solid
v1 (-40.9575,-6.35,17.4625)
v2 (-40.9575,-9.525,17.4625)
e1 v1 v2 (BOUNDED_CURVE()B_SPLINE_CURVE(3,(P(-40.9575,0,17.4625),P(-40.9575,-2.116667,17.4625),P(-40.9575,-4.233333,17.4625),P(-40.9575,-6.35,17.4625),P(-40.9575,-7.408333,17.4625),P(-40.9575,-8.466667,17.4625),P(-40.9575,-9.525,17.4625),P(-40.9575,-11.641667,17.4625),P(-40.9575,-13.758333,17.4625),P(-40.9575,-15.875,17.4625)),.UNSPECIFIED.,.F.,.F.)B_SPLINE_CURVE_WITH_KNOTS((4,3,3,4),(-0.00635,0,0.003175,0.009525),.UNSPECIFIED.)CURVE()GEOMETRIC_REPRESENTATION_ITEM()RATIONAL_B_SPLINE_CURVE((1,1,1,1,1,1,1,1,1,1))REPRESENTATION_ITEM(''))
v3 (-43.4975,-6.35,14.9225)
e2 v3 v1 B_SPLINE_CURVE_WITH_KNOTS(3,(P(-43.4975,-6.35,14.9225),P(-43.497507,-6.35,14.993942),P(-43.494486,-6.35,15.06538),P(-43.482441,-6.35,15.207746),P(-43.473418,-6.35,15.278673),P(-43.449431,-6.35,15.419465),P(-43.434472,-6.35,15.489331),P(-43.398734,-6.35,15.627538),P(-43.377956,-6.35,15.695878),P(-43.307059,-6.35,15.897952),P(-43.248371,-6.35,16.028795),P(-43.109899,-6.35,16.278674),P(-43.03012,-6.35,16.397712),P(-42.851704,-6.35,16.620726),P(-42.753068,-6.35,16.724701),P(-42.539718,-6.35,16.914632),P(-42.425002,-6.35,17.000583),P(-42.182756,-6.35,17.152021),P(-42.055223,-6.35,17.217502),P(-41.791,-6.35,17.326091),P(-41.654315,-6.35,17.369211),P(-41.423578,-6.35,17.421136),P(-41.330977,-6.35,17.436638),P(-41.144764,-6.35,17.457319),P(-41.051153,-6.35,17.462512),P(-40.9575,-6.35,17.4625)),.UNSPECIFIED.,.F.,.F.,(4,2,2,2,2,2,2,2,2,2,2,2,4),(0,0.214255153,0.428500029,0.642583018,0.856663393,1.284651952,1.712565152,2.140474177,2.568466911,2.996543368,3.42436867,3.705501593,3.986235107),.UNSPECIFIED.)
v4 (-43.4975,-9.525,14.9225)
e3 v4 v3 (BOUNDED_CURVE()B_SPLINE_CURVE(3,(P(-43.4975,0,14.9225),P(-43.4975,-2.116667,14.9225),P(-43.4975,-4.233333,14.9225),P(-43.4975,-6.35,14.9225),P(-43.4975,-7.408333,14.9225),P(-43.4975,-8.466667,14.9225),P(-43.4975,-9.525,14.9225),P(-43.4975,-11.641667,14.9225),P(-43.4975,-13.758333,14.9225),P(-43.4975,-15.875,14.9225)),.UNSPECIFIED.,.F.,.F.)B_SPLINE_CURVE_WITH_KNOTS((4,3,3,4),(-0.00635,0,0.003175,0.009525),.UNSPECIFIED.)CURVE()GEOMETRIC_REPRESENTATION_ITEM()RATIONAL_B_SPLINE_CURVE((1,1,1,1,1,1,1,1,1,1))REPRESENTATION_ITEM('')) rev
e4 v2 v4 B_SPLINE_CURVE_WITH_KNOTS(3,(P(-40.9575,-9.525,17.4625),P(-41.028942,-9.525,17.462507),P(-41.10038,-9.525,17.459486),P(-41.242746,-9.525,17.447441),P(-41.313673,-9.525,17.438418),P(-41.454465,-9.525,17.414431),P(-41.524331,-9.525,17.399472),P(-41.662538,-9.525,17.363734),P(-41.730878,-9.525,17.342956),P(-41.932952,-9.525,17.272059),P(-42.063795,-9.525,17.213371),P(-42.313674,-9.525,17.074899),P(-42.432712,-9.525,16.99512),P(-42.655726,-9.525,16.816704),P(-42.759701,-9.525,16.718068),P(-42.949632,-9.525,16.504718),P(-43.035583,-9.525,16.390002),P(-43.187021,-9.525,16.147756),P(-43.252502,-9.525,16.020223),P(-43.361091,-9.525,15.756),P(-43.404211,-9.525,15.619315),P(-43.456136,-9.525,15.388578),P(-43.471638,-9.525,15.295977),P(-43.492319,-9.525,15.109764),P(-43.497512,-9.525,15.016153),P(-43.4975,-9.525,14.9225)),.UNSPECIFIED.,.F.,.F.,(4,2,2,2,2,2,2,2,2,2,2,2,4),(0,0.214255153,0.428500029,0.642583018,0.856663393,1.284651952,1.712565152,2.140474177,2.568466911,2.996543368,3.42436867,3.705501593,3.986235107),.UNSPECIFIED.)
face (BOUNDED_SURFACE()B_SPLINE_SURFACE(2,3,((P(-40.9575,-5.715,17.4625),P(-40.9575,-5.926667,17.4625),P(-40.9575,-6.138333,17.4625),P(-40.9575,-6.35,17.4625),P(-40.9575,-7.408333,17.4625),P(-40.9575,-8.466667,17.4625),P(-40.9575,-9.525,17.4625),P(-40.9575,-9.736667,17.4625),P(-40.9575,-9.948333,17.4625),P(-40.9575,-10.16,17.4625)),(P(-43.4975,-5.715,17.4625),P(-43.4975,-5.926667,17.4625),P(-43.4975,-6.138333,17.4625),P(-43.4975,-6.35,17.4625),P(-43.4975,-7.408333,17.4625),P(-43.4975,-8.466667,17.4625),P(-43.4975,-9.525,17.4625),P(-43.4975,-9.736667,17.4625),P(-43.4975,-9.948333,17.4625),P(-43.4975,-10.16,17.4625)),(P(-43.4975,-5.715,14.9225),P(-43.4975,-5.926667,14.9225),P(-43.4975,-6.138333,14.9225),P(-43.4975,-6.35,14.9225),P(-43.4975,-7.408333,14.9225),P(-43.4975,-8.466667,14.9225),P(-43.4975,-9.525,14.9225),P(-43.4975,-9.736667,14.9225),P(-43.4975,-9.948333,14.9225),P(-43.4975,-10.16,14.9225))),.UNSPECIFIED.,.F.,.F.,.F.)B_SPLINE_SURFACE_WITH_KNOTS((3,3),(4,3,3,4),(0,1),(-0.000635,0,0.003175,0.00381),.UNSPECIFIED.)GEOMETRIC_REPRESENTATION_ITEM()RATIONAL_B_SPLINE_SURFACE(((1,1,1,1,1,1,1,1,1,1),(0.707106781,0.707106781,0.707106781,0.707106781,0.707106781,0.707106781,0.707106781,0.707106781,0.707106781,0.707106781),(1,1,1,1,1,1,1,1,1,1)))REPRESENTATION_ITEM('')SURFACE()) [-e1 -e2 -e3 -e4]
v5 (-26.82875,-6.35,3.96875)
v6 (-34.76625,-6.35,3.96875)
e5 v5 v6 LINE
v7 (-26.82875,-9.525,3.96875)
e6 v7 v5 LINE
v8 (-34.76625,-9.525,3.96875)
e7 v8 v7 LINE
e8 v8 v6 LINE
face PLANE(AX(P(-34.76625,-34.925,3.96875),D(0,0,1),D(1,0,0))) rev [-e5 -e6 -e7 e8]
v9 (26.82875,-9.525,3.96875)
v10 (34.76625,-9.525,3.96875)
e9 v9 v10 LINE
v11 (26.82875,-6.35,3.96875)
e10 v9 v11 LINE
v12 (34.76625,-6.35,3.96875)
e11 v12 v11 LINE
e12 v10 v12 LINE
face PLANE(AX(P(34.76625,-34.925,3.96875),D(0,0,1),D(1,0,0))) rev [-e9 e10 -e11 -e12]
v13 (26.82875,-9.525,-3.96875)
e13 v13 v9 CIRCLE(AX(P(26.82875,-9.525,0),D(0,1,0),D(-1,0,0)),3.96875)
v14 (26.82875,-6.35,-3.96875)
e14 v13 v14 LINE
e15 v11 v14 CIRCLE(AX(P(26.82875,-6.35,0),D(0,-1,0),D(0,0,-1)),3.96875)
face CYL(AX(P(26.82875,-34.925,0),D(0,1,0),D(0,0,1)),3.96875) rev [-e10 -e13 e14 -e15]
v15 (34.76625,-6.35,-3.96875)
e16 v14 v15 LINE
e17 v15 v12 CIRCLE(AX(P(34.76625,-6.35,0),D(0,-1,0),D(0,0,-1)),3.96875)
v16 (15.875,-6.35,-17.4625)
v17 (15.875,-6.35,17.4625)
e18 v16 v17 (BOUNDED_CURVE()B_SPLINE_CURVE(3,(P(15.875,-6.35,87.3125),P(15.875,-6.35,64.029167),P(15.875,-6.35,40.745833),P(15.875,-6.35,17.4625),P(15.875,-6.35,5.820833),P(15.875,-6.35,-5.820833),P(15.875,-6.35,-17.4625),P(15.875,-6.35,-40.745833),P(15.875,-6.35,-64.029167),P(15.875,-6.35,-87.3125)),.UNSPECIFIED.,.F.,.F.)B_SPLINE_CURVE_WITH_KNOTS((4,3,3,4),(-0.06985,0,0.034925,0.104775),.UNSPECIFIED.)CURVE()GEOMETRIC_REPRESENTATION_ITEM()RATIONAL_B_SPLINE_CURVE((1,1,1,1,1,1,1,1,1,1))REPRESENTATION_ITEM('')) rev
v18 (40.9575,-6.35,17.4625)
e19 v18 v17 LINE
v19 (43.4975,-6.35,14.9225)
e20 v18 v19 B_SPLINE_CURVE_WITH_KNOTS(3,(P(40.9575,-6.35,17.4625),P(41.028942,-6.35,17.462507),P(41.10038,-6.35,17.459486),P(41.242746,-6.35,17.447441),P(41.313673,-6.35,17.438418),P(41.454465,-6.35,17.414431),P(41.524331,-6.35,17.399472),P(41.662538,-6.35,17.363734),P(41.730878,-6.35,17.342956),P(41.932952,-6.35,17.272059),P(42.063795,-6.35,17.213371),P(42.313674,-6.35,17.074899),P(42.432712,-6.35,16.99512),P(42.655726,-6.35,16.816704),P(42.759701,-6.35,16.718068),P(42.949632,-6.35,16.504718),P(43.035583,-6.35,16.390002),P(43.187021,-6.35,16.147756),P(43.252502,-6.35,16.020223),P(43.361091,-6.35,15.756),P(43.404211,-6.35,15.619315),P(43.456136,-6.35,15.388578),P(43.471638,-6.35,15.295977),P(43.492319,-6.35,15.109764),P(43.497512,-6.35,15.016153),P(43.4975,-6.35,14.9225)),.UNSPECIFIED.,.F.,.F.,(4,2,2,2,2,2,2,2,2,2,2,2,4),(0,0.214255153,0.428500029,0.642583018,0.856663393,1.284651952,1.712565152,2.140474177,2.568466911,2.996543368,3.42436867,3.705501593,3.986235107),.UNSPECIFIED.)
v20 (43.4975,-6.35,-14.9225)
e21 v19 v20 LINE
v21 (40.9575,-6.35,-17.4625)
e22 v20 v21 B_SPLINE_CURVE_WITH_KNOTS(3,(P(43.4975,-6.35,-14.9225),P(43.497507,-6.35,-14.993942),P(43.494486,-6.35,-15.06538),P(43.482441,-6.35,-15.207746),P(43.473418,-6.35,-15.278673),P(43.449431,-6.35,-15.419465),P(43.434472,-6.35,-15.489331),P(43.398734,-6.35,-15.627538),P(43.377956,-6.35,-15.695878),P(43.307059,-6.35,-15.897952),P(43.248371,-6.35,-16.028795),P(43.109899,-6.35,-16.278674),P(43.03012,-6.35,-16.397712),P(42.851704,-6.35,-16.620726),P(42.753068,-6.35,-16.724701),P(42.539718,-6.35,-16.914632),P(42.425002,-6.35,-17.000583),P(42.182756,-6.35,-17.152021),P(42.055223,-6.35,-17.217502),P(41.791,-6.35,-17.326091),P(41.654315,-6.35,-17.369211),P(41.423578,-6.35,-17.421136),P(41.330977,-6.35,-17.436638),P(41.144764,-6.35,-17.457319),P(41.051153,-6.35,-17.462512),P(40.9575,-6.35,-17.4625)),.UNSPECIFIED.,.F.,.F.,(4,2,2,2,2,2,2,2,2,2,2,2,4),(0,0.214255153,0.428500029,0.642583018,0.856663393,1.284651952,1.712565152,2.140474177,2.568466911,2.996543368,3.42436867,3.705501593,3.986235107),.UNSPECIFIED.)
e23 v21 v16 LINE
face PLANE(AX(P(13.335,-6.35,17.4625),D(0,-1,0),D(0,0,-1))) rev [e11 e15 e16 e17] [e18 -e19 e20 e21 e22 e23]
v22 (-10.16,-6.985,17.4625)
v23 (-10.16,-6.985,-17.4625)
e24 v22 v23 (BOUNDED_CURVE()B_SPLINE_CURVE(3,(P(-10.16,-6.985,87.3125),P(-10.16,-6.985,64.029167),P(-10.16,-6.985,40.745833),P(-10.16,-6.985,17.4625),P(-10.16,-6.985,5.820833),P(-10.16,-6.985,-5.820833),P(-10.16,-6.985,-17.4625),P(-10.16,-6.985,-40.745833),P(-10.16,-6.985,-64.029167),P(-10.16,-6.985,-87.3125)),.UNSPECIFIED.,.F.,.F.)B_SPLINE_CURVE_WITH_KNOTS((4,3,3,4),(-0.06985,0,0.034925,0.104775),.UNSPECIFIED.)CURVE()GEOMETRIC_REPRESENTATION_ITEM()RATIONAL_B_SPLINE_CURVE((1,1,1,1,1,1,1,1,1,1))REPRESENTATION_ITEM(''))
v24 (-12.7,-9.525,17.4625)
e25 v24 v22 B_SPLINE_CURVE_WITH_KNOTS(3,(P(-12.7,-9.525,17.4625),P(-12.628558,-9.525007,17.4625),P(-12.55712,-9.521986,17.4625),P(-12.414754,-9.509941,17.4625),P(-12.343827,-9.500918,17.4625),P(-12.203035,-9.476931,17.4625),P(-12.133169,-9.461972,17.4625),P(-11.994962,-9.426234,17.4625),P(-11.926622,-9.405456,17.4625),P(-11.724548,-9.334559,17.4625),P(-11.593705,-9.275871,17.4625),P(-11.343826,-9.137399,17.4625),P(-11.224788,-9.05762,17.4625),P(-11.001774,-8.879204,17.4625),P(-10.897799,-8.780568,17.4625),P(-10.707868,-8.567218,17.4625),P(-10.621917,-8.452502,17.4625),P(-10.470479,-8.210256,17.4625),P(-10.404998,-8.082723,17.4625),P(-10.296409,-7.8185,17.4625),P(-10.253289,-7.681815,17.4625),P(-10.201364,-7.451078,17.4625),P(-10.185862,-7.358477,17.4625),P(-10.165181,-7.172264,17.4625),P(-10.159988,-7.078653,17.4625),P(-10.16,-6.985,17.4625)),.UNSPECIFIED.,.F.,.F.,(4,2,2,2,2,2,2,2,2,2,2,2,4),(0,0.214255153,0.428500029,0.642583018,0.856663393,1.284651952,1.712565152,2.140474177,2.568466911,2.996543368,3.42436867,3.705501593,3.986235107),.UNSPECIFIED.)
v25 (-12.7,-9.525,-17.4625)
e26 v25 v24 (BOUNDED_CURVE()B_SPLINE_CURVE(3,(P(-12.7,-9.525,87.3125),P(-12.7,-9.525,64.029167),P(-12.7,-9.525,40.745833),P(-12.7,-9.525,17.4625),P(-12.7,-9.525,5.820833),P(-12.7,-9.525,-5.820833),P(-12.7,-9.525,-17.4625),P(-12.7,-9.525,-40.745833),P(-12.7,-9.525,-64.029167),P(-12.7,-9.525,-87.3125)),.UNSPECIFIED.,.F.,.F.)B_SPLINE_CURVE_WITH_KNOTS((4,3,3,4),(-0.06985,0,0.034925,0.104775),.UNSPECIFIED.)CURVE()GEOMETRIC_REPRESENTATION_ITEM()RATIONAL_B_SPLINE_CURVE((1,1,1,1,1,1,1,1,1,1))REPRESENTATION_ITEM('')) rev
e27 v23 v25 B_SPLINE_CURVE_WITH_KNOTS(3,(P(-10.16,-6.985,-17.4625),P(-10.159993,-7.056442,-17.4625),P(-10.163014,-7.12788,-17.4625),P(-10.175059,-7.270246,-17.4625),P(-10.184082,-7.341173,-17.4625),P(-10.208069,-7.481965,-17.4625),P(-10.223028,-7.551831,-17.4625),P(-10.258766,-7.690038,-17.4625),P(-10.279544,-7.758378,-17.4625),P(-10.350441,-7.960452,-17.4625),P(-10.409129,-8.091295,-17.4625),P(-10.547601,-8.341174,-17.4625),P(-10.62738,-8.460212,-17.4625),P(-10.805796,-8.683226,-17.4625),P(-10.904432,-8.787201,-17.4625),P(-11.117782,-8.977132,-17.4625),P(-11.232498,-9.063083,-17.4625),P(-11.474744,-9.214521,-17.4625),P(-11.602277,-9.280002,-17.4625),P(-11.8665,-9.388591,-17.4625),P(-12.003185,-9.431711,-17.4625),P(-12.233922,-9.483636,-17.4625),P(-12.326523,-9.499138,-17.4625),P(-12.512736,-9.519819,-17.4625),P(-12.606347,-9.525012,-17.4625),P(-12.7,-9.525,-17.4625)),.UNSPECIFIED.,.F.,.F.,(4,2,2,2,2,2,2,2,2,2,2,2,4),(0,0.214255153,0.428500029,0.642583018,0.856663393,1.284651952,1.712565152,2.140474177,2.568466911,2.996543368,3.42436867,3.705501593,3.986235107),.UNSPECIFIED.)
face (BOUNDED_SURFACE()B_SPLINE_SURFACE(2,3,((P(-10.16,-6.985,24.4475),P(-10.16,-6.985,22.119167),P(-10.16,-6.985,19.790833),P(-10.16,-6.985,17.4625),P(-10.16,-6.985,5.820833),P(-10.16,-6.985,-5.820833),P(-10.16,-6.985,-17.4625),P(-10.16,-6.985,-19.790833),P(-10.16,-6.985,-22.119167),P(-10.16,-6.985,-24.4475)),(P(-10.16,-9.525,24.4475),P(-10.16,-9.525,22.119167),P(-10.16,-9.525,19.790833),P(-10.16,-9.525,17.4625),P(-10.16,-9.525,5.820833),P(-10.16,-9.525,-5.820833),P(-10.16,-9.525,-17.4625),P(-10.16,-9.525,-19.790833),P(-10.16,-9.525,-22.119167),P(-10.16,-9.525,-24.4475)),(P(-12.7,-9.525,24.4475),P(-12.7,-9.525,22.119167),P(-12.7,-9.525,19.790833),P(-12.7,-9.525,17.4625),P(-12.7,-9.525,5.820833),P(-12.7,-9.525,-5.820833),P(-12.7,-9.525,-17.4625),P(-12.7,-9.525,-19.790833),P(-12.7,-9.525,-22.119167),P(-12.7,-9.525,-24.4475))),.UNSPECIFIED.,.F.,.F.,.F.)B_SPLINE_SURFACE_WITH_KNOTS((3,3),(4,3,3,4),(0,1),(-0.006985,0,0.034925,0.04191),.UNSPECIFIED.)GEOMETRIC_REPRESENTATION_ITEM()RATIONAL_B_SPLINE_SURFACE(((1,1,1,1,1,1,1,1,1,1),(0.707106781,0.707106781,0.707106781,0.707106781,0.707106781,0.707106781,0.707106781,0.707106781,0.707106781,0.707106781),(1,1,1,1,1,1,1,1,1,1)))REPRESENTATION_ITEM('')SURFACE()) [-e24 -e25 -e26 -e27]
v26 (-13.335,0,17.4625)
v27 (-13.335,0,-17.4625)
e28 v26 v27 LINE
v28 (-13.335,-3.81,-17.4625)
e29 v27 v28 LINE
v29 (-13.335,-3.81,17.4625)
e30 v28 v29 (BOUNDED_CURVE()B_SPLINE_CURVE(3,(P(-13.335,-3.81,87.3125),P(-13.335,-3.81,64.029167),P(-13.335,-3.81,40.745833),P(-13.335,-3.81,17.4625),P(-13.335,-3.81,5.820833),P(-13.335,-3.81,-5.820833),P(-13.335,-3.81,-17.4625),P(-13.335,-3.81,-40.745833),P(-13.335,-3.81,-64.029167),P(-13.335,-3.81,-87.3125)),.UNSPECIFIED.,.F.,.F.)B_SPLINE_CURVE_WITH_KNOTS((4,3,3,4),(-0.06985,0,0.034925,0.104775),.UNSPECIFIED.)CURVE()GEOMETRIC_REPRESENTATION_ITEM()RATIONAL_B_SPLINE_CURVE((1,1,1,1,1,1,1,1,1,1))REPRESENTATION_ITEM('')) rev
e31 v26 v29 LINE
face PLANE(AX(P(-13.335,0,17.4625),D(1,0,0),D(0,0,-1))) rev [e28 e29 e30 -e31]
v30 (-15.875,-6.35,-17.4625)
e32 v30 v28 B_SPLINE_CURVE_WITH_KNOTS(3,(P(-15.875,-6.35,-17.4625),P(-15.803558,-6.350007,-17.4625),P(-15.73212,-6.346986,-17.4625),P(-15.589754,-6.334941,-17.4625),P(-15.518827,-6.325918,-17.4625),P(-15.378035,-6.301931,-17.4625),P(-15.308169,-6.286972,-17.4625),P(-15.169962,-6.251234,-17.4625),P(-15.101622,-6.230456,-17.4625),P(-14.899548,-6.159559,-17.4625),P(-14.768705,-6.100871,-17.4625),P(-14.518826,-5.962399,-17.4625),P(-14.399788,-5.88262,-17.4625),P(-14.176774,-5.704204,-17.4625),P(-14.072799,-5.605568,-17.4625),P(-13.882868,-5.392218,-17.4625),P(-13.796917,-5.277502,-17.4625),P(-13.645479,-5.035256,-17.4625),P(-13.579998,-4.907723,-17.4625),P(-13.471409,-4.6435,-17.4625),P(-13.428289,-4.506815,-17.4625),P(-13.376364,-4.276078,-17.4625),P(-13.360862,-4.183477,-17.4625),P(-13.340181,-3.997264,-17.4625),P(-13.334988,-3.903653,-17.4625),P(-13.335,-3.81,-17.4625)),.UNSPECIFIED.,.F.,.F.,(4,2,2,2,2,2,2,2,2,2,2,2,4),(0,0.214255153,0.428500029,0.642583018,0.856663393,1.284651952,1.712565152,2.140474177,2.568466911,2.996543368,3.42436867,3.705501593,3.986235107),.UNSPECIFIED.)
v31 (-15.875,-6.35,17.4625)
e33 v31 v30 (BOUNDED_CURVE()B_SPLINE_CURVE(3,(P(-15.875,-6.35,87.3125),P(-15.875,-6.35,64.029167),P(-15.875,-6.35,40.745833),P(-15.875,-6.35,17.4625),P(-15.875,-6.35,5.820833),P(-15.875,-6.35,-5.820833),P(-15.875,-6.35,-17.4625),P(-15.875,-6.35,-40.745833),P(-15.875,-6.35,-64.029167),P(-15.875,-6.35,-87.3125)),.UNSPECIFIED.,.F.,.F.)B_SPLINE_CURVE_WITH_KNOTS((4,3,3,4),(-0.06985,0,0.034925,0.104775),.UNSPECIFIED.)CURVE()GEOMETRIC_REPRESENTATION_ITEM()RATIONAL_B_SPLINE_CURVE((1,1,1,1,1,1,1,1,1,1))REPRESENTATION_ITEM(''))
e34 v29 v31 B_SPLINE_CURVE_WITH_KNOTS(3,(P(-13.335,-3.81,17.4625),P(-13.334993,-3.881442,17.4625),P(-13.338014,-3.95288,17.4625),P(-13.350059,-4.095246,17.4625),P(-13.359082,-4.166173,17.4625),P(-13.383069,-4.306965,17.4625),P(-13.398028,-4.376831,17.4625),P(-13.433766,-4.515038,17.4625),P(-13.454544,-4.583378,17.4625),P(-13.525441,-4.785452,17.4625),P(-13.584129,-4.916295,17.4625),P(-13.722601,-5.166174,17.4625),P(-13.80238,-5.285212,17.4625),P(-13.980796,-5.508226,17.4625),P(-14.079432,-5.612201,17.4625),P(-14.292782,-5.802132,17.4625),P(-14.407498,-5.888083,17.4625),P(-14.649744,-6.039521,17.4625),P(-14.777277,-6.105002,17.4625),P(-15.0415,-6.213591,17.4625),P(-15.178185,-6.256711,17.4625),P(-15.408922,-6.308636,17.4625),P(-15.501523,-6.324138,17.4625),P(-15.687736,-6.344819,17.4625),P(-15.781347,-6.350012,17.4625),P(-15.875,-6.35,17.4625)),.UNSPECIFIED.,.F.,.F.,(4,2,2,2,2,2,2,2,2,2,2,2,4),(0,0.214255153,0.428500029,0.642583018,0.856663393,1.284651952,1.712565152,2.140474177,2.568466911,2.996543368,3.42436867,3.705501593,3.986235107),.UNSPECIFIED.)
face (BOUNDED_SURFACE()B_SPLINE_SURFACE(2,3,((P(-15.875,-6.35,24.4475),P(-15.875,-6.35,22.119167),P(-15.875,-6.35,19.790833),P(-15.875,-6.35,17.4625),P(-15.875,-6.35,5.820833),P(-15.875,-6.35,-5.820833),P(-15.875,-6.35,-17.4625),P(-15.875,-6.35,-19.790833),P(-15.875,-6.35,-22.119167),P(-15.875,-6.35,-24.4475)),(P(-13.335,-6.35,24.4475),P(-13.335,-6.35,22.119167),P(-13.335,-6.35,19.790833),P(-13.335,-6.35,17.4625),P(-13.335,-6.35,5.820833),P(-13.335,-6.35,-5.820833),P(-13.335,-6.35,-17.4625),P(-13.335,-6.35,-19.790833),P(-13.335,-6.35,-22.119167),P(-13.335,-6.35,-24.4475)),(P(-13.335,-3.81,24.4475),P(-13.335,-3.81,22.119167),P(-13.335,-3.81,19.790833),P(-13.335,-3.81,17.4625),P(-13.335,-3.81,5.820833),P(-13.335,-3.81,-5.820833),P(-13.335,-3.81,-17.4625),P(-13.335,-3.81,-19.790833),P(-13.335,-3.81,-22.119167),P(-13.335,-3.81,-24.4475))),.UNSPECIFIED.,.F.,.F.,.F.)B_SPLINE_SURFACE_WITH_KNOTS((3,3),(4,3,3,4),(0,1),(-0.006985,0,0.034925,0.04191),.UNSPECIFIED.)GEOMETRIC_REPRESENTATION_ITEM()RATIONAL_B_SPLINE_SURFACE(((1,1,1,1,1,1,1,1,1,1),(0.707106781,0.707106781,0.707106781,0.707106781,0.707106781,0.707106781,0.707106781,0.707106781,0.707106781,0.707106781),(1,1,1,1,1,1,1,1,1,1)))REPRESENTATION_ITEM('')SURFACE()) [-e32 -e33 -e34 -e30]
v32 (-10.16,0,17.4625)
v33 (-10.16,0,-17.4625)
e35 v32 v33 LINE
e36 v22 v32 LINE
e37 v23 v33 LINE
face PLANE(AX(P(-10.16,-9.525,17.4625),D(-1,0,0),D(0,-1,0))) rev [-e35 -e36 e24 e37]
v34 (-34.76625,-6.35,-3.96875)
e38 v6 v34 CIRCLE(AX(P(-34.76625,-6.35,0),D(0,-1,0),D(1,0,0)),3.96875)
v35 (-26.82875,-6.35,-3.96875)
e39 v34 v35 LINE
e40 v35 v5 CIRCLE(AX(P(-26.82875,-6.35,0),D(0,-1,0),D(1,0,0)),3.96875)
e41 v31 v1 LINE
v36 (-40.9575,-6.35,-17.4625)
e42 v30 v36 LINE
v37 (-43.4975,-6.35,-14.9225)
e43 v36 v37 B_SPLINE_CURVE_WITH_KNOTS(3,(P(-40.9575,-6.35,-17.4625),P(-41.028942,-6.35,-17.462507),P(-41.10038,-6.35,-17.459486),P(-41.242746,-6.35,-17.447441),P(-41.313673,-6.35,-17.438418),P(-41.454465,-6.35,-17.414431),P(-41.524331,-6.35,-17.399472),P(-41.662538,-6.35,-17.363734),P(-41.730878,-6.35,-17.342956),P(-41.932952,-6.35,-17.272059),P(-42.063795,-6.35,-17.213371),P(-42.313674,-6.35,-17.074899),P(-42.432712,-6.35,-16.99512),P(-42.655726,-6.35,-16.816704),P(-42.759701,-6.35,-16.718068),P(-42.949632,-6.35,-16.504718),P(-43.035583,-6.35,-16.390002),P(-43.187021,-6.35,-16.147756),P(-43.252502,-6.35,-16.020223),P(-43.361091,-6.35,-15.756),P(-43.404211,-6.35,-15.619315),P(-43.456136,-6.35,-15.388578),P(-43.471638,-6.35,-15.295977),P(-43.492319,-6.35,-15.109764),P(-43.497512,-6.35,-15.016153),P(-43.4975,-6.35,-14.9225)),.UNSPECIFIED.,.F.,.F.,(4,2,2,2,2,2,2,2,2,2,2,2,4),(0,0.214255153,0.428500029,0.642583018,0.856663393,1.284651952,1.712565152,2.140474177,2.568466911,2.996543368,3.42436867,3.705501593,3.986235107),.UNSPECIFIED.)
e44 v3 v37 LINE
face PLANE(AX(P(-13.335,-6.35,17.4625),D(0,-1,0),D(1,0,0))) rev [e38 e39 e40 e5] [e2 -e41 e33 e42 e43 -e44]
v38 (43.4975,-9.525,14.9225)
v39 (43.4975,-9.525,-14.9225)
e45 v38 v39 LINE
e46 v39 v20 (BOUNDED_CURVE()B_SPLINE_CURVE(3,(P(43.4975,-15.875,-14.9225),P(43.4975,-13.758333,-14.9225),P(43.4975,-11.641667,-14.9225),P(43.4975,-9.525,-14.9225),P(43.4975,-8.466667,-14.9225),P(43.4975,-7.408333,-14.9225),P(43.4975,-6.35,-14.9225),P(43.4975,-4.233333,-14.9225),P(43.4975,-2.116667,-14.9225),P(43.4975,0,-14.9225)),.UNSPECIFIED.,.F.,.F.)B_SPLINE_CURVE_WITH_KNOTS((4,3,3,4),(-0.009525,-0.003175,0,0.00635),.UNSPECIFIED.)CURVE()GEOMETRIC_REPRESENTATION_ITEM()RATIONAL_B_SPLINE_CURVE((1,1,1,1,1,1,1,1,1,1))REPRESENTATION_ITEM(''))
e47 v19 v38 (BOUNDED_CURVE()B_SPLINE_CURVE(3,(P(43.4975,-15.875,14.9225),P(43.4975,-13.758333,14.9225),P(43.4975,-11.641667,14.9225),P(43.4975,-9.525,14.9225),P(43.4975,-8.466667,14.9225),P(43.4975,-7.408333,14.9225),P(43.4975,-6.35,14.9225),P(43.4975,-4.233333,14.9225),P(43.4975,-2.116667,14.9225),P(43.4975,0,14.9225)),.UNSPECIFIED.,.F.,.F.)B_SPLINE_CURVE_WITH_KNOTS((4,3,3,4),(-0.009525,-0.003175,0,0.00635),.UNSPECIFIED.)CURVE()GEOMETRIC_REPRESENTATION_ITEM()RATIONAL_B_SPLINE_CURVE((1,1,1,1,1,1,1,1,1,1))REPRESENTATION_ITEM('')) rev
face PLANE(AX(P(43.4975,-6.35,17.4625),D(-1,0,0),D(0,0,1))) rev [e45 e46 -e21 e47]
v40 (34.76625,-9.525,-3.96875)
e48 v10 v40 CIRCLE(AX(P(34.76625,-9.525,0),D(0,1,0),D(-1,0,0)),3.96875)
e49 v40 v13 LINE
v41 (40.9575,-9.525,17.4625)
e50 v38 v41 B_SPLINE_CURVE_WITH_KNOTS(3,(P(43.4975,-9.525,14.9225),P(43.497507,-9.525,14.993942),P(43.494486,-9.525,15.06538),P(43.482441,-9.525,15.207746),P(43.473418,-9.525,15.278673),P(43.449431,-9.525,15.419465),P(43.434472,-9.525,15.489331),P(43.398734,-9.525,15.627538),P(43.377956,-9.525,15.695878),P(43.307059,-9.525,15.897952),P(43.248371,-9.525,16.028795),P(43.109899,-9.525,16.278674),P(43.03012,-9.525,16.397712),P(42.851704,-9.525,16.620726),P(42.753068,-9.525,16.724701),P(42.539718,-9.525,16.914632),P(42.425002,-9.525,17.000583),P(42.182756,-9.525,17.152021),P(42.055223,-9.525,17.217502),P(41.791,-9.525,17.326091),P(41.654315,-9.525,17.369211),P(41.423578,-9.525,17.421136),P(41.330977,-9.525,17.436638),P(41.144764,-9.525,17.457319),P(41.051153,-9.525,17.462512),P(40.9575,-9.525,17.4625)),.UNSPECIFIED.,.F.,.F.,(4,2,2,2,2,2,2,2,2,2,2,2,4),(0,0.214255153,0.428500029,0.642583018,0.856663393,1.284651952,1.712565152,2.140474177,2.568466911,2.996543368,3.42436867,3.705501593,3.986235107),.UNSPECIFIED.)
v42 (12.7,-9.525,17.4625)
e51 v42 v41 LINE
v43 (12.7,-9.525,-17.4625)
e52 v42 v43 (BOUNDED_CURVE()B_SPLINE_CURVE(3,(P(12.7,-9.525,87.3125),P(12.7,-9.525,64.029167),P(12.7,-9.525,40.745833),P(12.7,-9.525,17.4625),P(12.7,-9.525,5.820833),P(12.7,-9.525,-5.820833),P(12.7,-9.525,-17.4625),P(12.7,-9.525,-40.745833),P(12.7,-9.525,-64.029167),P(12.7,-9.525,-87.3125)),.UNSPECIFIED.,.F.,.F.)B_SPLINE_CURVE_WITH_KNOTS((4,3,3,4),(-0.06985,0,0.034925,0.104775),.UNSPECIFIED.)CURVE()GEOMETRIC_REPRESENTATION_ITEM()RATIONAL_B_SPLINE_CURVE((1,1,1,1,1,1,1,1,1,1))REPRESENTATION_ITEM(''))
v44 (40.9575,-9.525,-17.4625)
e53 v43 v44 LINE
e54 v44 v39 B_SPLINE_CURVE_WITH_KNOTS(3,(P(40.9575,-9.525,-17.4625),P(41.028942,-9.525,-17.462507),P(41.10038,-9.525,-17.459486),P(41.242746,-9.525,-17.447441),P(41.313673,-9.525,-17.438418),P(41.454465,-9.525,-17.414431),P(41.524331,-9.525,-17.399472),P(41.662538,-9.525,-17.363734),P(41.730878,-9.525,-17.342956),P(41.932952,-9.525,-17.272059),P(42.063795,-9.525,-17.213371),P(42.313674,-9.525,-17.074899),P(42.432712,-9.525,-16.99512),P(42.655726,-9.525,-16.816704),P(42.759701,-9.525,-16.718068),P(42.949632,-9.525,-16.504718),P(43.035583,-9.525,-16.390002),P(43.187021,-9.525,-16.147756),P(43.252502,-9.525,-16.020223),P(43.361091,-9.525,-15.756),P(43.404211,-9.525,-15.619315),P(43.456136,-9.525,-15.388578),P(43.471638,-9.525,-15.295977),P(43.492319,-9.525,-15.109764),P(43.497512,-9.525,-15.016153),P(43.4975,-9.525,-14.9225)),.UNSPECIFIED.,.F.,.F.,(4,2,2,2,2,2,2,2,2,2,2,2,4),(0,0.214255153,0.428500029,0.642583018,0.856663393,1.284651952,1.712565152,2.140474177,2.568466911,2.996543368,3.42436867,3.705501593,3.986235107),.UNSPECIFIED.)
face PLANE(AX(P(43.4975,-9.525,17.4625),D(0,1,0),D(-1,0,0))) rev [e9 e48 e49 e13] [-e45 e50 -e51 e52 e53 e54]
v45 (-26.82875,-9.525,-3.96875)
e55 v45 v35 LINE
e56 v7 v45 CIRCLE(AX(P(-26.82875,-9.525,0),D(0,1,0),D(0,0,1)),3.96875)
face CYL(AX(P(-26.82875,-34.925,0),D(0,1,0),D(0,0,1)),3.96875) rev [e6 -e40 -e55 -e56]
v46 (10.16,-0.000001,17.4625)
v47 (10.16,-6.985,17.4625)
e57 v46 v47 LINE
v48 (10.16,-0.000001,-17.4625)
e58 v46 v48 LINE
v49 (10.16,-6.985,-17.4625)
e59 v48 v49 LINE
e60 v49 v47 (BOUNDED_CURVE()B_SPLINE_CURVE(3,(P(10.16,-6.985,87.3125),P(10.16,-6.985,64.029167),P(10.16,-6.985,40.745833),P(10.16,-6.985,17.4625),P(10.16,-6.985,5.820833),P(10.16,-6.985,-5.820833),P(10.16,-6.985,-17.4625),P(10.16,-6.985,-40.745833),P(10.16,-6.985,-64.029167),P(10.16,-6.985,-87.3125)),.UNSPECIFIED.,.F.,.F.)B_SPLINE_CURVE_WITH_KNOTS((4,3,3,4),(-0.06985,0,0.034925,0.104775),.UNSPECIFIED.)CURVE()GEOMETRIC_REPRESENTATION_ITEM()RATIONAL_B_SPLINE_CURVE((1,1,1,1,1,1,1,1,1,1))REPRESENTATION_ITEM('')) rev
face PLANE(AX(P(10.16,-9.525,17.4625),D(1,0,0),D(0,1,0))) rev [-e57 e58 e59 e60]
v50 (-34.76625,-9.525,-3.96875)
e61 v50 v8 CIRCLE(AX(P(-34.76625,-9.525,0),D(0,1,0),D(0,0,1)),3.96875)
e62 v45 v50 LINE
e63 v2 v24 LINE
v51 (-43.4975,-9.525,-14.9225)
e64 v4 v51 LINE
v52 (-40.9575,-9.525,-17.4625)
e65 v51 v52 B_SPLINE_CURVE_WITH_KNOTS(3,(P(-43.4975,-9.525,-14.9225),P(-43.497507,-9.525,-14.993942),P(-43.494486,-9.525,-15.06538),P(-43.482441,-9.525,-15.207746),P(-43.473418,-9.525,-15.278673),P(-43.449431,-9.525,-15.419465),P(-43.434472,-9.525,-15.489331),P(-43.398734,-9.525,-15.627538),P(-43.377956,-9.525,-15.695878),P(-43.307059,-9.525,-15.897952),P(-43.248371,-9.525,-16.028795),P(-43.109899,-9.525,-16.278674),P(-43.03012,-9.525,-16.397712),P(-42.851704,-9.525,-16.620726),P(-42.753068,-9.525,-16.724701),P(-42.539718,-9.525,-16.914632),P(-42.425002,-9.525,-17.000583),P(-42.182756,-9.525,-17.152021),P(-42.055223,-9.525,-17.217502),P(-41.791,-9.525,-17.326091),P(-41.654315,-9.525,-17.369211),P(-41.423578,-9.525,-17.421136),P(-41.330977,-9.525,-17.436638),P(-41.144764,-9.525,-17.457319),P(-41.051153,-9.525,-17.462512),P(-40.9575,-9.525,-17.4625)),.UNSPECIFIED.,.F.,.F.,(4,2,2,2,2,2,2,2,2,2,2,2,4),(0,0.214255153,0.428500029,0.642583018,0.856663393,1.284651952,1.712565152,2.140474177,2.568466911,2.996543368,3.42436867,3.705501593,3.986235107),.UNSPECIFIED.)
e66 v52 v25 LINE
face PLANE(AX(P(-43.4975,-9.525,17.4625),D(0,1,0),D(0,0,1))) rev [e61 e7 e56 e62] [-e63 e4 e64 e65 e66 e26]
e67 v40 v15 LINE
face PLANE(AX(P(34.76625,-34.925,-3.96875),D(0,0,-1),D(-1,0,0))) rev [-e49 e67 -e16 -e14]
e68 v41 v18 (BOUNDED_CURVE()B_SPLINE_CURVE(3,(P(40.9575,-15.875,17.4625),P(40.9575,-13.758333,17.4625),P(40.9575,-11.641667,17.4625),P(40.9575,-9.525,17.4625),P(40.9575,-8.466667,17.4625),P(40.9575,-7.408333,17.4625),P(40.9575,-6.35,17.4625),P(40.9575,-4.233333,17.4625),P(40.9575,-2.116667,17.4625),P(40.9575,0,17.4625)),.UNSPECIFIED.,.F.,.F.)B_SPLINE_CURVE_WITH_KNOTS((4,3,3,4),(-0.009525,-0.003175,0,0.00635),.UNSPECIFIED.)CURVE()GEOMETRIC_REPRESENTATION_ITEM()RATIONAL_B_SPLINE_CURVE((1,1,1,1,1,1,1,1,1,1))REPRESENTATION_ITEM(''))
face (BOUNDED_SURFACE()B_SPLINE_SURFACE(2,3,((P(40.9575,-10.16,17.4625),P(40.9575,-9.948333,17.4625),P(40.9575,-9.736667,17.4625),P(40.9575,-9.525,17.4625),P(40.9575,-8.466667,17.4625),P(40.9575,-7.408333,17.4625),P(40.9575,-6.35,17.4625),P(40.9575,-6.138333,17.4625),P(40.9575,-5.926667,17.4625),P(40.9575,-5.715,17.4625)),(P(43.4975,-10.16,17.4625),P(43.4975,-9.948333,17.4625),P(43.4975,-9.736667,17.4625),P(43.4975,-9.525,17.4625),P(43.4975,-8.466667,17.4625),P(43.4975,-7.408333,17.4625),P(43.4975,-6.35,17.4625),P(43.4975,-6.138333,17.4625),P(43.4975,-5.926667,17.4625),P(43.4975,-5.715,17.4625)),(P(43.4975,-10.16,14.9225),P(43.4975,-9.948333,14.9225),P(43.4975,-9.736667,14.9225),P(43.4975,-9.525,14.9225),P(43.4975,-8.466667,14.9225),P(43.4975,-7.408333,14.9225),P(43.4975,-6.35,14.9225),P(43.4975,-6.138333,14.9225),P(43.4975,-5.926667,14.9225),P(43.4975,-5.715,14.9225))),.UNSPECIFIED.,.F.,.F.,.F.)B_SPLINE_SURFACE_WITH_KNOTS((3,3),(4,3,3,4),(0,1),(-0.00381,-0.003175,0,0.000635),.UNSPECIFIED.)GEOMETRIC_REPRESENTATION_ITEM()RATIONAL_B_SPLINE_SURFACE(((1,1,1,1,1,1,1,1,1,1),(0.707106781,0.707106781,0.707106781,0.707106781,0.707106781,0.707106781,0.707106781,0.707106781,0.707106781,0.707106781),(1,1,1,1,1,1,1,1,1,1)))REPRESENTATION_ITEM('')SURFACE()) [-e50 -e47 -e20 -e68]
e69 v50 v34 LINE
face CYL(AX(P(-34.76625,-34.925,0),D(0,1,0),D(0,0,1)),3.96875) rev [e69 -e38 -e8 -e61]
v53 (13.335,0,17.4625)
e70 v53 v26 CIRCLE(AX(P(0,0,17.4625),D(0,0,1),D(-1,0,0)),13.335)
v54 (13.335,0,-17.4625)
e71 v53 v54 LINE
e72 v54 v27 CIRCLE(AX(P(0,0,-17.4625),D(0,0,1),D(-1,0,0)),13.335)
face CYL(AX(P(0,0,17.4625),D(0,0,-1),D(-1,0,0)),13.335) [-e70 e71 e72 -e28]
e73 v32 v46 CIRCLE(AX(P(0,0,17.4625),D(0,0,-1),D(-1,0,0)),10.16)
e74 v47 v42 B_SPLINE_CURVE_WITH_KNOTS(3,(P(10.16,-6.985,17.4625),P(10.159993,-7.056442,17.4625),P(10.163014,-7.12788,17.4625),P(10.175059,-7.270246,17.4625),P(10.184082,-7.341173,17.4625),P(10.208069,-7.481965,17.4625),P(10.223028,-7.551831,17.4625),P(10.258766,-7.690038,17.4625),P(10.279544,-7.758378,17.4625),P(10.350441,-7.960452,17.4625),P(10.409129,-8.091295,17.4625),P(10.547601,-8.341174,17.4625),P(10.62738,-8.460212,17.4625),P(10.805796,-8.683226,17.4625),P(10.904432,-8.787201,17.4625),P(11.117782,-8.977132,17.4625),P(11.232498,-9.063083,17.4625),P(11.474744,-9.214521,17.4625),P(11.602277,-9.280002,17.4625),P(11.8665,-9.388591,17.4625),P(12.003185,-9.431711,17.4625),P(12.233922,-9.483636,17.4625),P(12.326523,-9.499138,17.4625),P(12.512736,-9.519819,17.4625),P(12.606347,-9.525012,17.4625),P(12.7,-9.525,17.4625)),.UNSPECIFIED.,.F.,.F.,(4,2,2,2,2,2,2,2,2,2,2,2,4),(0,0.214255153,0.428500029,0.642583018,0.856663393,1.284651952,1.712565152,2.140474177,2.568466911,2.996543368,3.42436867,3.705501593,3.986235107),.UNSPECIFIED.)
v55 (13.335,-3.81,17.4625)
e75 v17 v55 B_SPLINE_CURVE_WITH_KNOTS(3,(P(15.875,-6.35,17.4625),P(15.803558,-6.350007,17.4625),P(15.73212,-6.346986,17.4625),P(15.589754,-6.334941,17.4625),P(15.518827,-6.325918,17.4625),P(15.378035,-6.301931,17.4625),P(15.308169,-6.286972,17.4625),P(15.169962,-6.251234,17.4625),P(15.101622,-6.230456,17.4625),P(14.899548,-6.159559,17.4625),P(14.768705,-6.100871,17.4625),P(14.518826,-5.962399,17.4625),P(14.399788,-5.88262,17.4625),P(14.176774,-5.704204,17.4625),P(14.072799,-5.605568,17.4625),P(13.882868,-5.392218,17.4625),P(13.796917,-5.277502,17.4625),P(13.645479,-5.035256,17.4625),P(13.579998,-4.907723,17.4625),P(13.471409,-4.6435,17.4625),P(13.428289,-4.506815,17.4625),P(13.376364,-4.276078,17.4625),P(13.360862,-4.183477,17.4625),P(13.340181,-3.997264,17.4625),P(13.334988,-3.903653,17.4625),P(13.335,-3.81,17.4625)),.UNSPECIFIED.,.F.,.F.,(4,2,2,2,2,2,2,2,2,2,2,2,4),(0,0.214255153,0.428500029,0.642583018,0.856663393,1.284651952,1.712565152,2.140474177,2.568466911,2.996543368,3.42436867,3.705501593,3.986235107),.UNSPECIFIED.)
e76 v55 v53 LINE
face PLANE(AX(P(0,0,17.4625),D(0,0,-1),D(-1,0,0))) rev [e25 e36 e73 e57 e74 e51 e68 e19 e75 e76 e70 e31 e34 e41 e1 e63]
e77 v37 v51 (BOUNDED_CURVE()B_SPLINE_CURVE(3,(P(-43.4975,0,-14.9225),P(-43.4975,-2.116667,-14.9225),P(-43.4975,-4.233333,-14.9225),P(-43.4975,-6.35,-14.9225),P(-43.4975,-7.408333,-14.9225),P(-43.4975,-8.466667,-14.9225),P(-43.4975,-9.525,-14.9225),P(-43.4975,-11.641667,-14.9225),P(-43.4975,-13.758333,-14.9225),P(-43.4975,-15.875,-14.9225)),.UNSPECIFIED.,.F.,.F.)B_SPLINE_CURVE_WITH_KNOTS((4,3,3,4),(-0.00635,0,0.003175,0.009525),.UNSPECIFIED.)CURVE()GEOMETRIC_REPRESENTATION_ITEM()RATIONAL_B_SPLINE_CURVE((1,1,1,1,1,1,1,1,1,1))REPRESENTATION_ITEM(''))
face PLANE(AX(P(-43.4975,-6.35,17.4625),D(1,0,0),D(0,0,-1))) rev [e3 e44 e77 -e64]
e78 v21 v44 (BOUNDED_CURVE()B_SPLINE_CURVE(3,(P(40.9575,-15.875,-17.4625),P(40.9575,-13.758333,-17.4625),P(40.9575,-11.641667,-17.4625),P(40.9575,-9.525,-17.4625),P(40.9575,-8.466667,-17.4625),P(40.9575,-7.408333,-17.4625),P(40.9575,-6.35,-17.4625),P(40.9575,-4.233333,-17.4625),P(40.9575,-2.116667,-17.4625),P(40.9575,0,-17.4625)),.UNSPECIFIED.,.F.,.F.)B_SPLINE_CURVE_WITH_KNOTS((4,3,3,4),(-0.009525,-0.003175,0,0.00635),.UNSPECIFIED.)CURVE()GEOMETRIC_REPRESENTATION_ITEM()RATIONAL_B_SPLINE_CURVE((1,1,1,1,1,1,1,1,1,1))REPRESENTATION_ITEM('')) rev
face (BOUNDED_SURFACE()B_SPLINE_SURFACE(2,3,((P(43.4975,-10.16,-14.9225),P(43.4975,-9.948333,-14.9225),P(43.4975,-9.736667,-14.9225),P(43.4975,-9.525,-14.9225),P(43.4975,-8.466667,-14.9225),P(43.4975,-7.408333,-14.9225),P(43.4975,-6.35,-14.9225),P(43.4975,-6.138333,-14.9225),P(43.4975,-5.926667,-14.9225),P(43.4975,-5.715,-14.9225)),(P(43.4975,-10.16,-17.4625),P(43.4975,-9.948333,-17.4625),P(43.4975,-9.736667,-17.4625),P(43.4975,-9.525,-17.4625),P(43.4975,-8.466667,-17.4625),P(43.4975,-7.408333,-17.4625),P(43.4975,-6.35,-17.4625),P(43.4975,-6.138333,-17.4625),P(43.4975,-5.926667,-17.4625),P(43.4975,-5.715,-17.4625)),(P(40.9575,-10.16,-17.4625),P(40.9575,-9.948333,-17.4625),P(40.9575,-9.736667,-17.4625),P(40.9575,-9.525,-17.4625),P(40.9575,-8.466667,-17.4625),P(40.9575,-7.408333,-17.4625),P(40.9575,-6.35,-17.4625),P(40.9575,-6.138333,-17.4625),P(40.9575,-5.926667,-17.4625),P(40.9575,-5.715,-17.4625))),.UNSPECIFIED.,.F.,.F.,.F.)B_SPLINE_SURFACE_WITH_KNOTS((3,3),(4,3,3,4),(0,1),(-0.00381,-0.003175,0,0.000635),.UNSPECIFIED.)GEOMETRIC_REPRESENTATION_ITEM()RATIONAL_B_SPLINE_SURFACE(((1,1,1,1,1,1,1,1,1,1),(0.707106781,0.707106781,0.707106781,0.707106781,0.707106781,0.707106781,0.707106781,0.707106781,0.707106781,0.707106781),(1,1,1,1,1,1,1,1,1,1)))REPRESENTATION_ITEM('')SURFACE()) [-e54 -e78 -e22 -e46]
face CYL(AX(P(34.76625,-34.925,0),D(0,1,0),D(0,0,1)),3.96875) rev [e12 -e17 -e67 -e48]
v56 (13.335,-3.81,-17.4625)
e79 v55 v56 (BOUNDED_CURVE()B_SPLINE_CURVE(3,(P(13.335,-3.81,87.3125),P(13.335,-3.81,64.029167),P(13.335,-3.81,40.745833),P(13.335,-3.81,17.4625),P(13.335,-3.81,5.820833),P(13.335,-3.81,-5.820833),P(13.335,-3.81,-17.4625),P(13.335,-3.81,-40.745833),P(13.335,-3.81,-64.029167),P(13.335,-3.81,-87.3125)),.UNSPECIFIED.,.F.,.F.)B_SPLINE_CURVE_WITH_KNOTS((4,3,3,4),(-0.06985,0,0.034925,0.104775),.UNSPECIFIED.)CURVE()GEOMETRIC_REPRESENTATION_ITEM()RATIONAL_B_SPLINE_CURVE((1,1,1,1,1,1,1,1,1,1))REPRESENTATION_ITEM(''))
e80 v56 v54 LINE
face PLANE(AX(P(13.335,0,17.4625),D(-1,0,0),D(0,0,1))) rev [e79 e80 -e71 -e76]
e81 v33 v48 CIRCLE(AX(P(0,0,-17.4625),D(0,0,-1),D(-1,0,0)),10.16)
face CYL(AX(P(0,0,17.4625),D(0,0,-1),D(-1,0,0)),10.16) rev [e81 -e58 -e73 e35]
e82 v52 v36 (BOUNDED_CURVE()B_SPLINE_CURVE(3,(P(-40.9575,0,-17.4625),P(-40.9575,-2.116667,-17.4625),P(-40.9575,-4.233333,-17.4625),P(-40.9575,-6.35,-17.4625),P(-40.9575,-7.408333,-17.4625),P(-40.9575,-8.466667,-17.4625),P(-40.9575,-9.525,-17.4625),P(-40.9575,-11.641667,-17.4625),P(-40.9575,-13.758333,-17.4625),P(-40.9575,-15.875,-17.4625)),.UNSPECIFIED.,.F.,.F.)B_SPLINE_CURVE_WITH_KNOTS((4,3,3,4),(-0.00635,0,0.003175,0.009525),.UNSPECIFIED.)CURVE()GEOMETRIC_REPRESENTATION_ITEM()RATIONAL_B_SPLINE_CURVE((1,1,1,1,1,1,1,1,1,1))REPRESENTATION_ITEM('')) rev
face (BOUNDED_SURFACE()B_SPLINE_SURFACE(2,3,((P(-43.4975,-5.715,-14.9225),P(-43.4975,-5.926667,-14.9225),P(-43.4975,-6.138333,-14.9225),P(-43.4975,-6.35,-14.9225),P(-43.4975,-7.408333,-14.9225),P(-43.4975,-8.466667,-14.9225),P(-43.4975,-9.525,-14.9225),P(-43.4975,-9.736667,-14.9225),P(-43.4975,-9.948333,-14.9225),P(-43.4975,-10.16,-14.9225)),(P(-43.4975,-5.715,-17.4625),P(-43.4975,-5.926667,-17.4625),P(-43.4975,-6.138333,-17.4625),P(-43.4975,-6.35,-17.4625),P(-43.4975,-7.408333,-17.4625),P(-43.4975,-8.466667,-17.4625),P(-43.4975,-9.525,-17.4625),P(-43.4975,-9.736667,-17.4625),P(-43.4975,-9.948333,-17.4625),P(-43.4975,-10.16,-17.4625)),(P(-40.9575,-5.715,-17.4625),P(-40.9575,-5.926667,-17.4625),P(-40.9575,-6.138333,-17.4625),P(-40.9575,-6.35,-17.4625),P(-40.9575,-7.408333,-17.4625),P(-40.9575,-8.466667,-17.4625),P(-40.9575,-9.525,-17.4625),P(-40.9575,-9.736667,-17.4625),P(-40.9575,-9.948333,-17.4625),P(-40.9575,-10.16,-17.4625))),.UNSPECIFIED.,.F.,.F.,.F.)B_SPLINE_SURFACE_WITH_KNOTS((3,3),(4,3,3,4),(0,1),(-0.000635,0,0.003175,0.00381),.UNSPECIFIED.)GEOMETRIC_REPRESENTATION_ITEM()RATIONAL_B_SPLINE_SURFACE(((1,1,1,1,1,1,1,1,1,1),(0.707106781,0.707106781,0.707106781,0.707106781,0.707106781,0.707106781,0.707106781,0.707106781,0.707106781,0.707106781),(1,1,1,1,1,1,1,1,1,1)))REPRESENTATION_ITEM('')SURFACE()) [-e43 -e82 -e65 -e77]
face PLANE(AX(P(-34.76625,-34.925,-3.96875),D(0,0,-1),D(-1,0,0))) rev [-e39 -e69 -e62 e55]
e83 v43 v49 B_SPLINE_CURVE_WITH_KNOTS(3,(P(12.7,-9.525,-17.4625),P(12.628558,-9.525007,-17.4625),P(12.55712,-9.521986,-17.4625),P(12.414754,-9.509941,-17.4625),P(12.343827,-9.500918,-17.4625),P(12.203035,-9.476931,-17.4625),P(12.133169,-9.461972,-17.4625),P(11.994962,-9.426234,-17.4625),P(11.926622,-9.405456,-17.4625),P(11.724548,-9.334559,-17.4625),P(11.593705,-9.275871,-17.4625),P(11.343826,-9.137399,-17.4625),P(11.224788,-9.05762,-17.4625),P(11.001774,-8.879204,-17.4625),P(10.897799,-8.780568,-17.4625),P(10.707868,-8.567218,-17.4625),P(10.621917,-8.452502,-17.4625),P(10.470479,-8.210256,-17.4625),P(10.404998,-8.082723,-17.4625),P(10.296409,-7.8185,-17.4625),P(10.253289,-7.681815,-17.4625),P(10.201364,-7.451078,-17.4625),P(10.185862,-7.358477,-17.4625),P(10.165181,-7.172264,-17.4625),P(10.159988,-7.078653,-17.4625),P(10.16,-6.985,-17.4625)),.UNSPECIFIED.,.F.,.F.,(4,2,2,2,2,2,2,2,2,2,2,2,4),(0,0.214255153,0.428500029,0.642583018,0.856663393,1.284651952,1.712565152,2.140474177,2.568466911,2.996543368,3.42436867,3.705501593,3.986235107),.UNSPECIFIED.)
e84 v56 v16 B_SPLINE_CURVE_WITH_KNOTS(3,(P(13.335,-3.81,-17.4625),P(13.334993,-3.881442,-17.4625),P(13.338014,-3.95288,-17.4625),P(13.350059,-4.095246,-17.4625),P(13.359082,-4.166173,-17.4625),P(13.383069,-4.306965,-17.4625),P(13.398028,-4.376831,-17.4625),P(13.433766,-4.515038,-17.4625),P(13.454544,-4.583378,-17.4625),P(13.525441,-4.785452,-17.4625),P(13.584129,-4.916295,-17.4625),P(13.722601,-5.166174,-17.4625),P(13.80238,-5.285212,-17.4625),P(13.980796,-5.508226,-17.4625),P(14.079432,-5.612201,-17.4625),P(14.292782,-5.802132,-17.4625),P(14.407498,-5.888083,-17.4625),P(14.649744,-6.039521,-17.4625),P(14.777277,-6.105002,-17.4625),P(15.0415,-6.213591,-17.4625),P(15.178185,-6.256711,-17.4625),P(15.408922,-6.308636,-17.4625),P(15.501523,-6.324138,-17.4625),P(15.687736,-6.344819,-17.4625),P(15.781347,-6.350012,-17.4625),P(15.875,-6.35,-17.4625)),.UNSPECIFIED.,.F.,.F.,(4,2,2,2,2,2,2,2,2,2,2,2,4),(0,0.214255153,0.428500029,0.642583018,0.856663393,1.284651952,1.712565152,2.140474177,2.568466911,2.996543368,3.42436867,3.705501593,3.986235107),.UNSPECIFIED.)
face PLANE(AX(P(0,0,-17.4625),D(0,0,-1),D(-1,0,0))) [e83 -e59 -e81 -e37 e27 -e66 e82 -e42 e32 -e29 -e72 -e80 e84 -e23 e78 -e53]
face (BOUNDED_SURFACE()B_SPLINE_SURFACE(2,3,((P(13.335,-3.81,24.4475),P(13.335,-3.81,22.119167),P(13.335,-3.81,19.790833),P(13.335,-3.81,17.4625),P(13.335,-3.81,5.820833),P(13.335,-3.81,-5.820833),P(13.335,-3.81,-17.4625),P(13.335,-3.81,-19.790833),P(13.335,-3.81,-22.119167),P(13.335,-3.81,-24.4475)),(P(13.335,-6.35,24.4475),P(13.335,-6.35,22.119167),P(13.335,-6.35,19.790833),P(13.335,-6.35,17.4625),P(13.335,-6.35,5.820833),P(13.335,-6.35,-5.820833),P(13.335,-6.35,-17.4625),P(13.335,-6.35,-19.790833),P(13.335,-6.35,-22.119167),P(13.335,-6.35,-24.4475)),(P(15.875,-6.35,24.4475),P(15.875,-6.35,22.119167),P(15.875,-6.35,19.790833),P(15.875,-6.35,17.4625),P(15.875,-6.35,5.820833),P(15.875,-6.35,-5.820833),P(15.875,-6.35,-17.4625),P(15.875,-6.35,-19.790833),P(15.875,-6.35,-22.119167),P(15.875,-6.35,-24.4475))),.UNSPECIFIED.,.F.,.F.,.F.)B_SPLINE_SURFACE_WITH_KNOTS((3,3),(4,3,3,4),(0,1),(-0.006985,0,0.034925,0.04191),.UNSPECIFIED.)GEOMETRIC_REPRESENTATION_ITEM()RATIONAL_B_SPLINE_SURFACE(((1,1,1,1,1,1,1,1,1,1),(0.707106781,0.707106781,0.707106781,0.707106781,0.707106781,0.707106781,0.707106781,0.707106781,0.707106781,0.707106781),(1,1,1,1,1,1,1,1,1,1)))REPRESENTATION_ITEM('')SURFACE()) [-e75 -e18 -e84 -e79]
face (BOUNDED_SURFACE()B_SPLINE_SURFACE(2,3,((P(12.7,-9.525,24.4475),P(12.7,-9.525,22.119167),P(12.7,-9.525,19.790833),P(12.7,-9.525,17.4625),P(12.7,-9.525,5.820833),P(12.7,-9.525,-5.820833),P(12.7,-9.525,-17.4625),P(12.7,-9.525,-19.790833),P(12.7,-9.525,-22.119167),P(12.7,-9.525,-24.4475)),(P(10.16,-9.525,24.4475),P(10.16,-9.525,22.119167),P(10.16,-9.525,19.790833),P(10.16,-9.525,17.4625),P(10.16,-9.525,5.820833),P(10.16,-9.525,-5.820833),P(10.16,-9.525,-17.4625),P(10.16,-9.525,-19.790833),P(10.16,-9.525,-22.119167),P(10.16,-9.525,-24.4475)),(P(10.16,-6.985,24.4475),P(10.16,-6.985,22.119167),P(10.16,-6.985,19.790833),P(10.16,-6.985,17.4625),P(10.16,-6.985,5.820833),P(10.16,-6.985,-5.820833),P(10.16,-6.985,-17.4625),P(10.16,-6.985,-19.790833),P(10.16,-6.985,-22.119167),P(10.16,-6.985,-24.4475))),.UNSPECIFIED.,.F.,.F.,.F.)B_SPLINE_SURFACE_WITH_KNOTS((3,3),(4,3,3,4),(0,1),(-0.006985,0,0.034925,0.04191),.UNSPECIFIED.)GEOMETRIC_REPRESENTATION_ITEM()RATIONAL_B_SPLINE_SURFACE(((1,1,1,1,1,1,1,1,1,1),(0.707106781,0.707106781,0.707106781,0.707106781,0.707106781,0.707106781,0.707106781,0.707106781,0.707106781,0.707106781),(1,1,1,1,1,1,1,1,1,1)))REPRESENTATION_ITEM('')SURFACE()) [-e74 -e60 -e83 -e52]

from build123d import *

# Parameters (mm, degrees)
BOSS_EXTRUDE1_DEPTH = 17.4625
VARFILLET1_R        = 2.54
CUT_EXTRUDE1_DEPTH  = 34.925


with BuildPart() as part:
    # Sketch1 → Boss-Extrude1 (new, symmetric)
    with BuildSketch(Plane.XY):
        with BuildLine():
            Line((-13.335, 0), (-13.335, -6.35))
            Line((-13.335, -6.35), (-43.4975, -6.35))
            Line((-43.4975, -6.35), (-43.4975, -9.525))
            Line((-43.4975, -9.525), (-10.16, -9.525))
            Line((-10.16, -9.525), (-10.16, 0))
            ThreePointArc((-10.16, 0), (3e-07, 10.16), (10.16, -6e-07))
            Line((10.16, -6e-07), (10.16, -9.525))
            Line((10.16, -9.525), (43.4975, -9.525))
            Line((43.4975, -9.525), (43.4975, -6.35))
            Line((43.4975, -6.35), (13.335, -6.35))
            Line((13.335, -6.35), (13.335, 0))
            ThreePointArc((13.335, 0), (0, 13.335), (-13.335, 0))
        make_face()
    extrude(amount=BOSS_EXTRUDE1_DEPTH, both=True)

    # VarFillet1
    varfillet1_edges = [part.edges().sort_by_distance(p)[0] for p in [
        (13.335, -6.35, 0),
        (-13.335, -6.35, 0),
        (10.16, -9.525, 0),
        (-10.16, -9.525, 0),
        (-43.4975, -7.9375, -17.4625),
        (-43.4975, -7.9375, 17.4625),
        (43.4975, -7.9375, -17.4625),
        (43.4975, -7.9375, 17.4625),
    ]]
    fillet(varfillet1_edges, radius=VARFILLET1_R)

    # Sketch2 → Cut-Extrude1 (cut)
    with BuildSketch(Plane(origin=(0, 0, 0), x_dir=(1, 0, 0), z_dir=(0, 1, 0))):
        with BuildLine():
            Line((-34.76625, 3.96875), (-26.82875, 3.96875))
            ThreePointArc((-26.82875, 3.96875), (-22.86, 0), (-26.82875, -3.96875))
            Line((-26.82875, -3.96875), (-34.76625, -3.96875))
            ThreePointArc((-34.76625, -3.96875), (-38.735, 0), (-34.76625, 3.96875))
        make_face()
        with BuildLine():
            Line((34.76625, -3.96875), (26.82875, -3.96875))
            ThreePointArc((26.82875, -3.96875), (22.86, 0), (26.82875, 3.96875))
            Line((26.82875, 3.96875), (34.76625, 3.96875))
            ThreePointArc((34.76625, 3.96875), (38.735, 0), (34.76625, -3.96875))
        make_face()
    extrude(amount=-CUT_EXTRUDE1_DEPTH, mode=Mode.SUBTRACT)


solid = part.part
